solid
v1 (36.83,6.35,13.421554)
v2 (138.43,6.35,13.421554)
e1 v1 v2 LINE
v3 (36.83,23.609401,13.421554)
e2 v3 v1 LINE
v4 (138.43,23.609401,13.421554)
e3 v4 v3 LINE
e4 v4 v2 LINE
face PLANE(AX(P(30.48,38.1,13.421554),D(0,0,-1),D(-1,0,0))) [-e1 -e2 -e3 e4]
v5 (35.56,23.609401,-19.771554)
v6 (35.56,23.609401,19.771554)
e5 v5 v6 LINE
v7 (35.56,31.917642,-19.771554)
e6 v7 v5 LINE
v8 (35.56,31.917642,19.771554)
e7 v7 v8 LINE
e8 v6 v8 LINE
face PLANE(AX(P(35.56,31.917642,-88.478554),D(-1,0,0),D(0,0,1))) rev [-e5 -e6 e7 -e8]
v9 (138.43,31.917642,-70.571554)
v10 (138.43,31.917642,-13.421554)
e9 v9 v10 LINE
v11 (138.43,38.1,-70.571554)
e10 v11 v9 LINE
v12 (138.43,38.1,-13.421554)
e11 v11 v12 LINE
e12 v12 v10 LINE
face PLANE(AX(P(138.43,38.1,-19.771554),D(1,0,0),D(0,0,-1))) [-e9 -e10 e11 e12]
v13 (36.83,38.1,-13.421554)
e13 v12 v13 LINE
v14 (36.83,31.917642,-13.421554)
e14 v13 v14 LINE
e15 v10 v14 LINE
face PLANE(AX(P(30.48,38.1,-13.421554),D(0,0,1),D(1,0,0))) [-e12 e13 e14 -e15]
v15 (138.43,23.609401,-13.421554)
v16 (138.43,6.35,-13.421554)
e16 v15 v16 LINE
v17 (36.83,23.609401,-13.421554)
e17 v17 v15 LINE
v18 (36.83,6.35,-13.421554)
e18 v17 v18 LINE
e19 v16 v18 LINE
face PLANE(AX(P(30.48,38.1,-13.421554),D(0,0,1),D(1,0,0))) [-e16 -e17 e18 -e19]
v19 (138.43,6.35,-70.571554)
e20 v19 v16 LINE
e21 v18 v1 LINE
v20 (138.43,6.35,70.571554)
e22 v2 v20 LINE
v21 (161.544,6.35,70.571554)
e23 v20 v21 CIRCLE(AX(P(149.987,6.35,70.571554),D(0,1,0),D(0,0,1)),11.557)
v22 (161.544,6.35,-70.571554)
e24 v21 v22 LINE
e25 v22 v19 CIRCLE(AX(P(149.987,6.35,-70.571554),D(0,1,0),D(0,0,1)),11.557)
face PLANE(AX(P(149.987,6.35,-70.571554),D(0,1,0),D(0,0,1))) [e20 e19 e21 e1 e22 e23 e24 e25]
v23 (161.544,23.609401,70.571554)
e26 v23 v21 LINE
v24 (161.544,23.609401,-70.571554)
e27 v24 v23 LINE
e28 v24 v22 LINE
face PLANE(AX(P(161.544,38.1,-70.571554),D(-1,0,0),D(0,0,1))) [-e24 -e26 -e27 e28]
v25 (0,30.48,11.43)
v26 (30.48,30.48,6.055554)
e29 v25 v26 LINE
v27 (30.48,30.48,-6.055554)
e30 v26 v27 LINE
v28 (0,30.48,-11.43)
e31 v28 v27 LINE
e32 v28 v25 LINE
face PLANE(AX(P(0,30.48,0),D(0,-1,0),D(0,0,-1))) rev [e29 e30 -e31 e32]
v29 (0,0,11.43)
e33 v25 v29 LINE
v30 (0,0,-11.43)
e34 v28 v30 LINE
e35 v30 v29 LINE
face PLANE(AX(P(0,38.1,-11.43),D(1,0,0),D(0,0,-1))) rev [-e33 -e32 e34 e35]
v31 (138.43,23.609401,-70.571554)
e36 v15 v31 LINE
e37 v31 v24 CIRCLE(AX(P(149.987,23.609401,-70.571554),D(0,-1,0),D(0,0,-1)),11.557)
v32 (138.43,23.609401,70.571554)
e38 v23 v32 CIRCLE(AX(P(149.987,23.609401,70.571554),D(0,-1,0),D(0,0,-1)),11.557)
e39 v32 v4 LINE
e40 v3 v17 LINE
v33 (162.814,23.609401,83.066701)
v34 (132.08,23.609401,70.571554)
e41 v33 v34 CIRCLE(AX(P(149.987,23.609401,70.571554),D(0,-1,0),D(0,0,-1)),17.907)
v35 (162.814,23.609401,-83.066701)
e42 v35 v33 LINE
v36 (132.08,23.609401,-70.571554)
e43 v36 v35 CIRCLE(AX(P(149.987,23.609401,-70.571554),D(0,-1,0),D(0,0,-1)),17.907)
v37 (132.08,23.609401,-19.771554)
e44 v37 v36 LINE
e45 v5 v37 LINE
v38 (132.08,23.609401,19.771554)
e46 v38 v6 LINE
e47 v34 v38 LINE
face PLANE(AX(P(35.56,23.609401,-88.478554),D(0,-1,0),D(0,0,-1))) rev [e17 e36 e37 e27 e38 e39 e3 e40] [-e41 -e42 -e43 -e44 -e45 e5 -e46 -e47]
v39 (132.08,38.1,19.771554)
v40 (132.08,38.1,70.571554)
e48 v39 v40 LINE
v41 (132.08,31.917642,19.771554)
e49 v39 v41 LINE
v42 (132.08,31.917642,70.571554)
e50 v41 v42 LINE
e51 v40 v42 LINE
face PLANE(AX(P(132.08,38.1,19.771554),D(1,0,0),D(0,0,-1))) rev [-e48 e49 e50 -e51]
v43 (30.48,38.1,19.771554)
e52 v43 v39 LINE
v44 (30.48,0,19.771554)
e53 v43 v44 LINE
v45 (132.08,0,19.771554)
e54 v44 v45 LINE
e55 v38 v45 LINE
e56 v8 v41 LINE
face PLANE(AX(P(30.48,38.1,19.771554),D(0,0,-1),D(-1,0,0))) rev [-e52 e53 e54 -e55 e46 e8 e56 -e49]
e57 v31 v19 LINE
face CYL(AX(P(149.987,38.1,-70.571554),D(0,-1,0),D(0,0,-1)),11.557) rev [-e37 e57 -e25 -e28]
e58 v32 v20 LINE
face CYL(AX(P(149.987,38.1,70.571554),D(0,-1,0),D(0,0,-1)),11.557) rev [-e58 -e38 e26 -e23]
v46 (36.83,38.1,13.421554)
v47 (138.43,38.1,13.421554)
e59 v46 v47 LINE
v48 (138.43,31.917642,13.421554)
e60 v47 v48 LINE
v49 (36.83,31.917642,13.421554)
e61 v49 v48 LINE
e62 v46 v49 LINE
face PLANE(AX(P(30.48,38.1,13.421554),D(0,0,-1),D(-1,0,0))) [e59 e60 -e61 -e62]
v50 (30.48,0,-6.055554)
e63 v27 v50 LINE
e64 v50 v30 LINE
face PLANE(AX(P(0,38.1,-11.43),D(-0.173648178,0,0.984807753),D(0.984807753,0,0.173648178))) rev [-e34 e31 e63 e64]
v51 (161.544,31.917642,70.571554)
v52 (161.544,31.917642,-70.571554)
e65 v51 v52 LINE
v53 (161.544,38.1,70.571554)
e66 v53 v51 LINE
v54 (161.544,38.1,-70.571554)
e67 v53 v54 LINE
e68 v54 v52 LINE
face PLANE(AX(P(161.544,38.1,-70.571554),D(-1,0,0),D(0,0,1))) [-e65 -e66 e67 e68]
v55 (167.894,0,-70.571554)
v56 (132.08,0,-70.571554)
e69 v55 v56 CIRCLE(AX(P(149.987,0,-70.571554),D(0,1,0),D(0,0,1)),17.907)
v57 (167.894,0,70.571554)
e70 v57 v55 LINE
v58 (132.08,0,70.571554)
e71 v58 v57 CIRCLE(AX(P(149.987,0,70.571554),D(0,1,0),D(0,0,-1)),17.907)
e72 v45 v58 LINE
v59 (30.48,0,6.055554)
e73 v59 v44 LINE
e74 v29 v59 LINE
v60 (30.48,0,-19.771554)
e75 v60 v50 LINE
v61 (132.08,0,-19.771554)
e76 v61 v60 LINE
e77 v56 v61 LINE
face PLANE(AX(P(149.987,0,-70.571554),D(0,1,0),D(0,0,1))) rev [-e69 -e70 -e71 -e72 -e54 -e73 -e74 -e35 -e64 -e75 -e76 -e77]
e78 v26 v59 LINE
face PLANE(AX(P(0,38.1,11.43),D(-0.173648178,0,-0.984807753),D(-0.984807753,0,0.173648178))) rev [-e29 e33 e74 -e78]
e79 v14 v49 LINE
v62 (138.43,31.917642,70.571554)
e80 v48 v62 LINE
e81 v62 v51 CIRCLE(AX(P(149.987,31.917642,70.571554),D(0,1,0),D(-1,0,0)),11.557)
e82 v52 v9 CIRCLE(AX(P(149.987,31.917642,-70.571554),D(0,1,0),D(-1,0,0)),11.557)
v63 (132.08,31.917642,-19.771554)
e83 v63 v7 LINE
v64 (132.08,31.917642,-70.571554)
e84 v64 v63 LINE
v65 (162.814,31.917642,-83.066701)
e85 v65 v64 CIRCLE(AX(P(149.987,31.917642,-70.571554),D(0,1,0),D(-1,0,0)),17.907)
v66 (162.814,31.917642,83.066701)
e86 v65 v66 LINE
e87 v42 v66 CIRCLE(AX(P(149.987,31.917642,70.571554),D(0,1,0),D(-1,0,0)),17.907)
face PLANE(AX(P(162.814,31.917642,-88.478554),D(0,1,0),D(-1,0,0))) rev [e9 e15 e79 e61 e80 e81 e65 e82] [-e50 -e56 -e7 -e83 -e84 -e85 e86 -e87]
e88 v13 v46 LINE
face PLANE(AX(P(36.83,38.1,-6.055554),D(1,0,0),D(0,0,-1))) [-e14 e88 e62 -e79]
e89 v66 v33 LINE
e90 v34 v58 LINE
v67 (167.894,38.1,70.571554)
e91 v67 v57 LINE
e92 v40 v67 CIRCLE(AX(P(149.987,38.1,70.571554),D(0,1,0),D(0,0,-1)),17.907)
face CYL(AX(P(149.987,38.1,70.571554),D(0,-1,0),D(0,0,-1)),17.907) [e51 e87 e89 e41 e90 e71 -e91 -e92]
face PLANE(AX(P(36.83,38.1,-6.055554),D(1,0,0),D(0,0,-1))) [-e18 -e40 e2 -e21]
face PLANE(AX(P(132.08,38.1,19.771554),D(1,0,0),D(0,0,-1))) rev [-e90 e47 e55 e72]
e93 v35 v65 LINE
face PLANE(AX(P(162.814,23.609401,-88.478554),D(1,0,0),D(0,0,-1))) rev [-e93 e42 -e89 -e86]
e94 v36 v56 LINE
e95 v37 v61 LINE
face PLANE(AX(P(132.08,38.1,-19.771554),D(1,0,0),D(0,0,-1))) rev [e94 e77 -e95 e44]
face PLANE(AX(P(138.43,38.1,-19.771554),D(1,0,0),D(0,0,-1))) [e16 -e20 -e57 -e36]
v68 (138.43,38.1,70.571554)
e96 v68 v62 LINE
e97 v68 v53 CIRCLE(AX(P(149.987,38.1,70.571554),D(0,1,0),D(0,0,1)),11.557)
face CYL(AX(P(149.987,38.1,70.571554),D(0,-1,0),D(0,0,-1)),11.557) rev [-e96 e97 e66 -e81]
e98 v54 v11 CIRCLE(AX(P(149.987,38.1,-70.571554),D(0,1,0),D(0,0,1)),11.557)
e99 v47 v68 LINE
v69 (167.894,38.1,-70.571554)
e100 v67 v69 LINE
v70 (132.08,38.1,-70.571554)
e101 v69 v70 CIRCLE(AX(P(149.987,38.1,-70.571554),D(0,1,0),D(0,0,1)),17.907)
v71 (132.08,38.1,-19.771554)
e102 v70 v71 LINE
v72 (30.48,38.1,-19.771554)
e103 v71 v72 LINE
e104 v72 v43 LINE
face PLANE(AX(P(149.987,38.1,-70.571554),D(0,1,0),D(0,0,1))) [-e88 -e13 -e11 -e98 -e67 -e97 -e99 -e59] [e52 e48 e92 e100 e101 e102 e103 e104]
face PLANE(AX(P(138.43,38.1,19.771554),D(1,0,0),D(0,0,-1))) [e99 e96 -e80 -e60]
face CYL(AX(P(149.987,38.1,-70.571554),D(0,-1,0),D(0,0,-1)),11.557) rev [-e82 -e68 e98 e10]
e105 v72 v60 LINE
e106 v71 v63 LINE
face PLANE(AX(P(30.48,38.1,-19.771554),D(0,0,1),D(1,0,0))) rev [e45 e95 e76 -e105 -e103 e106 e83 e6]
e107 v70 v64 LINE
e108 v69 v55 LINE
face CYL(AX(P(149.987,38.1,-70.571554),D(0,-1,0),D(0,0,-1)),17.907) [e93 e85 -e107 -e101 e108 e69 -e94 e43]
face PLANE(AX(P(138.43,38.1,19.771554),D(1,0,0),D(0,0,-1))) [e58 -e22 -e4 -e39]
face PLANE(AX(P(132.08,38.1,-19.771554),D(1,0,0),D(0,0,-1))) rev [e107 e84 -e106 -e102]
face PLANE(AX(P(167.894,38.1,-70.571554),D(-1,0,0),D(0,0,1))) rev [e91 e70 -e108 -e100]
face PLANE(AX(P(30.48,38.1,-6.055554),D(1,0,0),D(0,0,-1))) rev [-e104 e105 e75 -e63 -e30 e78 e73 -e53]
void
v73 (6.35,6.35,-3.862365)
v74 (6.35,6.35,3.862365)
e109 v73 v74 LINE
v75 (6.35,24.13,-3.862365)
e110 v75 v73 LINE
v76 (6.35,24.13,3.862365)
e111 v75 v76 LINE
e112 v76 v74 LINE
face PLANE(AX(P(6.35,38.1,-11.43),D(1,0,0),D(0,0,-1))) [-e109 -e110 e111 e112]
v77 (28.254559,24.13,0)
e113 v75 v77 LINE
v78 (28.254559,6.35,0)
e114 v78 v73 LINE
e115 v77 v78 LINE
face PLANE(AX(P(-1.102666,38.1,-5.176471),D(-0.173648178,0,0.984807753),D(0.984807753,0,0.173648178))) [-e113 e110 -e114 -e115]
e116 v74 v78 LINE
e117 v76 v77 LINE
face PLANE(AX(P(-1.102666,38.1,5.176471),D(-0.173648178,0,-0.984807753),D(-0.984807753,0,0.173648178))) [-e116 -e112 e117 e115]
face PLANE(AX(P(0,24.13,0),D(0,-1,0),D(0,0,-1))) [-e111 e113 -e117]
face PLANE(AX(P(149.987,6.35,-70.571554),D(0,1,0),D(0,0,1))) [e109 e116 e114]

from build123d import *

# Parameters (mm, degrees)
BOSS_EXTRUDE1_DEPTH      = 38.1
CUT_EXTRUDE10_DEPTH      = 7.62
SHELL2_START             = 6.35
SHELL2_DEPTH             = 31.75
SHELL2_2_DEPTH           = 17.78
CUT_EXTRUDE11_DEPTH      = 204.366887563
CUT_EXTRUDE11_DEPTH_BACK = 204.366887563
SKETCH6_W                = 127.254
SKETCH6_H                = 8.308241082


# Read off the part's stored shape, not the designer's step: Shell2
with BuildPart() as part:
    # Sketch1 → Boss-Extrude1 (new body)
    with BuildSketch(Plane(origin=(0, 0, 0), x_dir=(1, 0, 0), z_dir=(0, 1, 0))):
        with BuildLine():
            Line((0, 11.43), (0, -11.43))
            Line((0, -11.43), (30.48, -6.055553628))
            Line((30.48, -6.055553628), (30.48, -19.771553628))
            Line((30.48, -19.771553628), (132.08, -19.771553628))
            Line((132.08, -19.771553628), (132.08, -70.571553628))
            ThreePointArc((132.08, -70.571553628), (149.987, -88.478553628), (167.894, -70.571553628))
            Line((167.894, -70.571553628), (167.894, 70.571553628))
            ThreePointArc((167.894, 70.571553628), (149.987, 88.478553628), (132.08, 70.571553628))
            Line((132.08, 70.571553628), (132.08, 19.771553628))
            Line((132.08, 19.771553628), (30.48, 19.771553628))
            Line((30.48, 19.771553628), (30.48, 6.055553628))
            Line((30.48, 6.055553628), (0, 11.43))
        make_face()
    extrude(amount=BOSS_EXTRUDE1_DEPTH)

    # Sketch5 → Cut-Extrude10 (cut)
    with BuildSketch(Plane(origin=(0, 38.1, 0), x_dir=(1, 0, 0), z_dir=(0, 1, 0))):
        Polygon((0, -11.43), (0, 11.43), (0.205611809, 11.576348711), (30.48, 6.055553628), (30.48, -6.055553628), align=None)
    extrude(amount=-CUT_EXTRUDE10_DEPTH, mode=Mode.SUBTRACT)

    # Shell2 outline → Shell2 (cut)
    with BuildSketch(Plane(origin=(0, 0, 0), x_dir=(1, 0, 0), z_dir=(0, 1, 0)).offset(SHELL2_START)):
        with BuildLine():
            Line((36.83, 13.421553628), (36.83, -13.421553628))
            Line((36.83, -13.421553628), (138.43, -13.421553628))
            Line((138.43, -13.421553628), (138.43, -70.571553628))
            ThreePointArc((138.43, -70.571553628), (149.987, -82.128553628), (161.544, -70.571553628))
            Line((161.544, -70.571553628), (161.544, 70.571553628))
            ThreePointArc((161.544, 70.571553628), (149.987, 82.128553628), (138.43, 70.571553628))
            Line((138.43, 70.571553628), (138.43, 13.421553628))
            Line((138.43, 13.421553628), (36.83, 13.421553628))
        make_face()
    extrude(amount=SHELL2_DEPTH, mode=Mode.SUBTRACT)

    # Shell2 2 outline → Shell2 2 (cut)
    with BuildSketch(Plane(origin=(0, 0, 0), x_dir=(1, 0, 0), z_dir=(0, 1, 0)).offset(SHELL2_START)):
        Polygon((28.25455863, 0), (6.35, 3.862364687), (6.35, -3.862364687), align=None)
    extrude(amount=SHELL2_2_DEPTH, mode=Mode.SUBTRACT)

    # Sketch6 → Cut-Extrude11 (cut, two sides: drawn at the far end of the back side and taken through both)
    with BuildSketch(Plane.XY.offset(19.771553628).offset(-CUT_EXTRUDE11_DEPTH_BACK)):
        with Locations((99.187, 27.763521135)):
            Rectangle(SKETCH6_W, SKETCH6_H)
    extrude(amount=CUT_EXTRUDE11_DEPTH + CUT_EXTRUDE11_DEPTH_BACK, mode=Mode.SUBTRACT)


solid = part.part
